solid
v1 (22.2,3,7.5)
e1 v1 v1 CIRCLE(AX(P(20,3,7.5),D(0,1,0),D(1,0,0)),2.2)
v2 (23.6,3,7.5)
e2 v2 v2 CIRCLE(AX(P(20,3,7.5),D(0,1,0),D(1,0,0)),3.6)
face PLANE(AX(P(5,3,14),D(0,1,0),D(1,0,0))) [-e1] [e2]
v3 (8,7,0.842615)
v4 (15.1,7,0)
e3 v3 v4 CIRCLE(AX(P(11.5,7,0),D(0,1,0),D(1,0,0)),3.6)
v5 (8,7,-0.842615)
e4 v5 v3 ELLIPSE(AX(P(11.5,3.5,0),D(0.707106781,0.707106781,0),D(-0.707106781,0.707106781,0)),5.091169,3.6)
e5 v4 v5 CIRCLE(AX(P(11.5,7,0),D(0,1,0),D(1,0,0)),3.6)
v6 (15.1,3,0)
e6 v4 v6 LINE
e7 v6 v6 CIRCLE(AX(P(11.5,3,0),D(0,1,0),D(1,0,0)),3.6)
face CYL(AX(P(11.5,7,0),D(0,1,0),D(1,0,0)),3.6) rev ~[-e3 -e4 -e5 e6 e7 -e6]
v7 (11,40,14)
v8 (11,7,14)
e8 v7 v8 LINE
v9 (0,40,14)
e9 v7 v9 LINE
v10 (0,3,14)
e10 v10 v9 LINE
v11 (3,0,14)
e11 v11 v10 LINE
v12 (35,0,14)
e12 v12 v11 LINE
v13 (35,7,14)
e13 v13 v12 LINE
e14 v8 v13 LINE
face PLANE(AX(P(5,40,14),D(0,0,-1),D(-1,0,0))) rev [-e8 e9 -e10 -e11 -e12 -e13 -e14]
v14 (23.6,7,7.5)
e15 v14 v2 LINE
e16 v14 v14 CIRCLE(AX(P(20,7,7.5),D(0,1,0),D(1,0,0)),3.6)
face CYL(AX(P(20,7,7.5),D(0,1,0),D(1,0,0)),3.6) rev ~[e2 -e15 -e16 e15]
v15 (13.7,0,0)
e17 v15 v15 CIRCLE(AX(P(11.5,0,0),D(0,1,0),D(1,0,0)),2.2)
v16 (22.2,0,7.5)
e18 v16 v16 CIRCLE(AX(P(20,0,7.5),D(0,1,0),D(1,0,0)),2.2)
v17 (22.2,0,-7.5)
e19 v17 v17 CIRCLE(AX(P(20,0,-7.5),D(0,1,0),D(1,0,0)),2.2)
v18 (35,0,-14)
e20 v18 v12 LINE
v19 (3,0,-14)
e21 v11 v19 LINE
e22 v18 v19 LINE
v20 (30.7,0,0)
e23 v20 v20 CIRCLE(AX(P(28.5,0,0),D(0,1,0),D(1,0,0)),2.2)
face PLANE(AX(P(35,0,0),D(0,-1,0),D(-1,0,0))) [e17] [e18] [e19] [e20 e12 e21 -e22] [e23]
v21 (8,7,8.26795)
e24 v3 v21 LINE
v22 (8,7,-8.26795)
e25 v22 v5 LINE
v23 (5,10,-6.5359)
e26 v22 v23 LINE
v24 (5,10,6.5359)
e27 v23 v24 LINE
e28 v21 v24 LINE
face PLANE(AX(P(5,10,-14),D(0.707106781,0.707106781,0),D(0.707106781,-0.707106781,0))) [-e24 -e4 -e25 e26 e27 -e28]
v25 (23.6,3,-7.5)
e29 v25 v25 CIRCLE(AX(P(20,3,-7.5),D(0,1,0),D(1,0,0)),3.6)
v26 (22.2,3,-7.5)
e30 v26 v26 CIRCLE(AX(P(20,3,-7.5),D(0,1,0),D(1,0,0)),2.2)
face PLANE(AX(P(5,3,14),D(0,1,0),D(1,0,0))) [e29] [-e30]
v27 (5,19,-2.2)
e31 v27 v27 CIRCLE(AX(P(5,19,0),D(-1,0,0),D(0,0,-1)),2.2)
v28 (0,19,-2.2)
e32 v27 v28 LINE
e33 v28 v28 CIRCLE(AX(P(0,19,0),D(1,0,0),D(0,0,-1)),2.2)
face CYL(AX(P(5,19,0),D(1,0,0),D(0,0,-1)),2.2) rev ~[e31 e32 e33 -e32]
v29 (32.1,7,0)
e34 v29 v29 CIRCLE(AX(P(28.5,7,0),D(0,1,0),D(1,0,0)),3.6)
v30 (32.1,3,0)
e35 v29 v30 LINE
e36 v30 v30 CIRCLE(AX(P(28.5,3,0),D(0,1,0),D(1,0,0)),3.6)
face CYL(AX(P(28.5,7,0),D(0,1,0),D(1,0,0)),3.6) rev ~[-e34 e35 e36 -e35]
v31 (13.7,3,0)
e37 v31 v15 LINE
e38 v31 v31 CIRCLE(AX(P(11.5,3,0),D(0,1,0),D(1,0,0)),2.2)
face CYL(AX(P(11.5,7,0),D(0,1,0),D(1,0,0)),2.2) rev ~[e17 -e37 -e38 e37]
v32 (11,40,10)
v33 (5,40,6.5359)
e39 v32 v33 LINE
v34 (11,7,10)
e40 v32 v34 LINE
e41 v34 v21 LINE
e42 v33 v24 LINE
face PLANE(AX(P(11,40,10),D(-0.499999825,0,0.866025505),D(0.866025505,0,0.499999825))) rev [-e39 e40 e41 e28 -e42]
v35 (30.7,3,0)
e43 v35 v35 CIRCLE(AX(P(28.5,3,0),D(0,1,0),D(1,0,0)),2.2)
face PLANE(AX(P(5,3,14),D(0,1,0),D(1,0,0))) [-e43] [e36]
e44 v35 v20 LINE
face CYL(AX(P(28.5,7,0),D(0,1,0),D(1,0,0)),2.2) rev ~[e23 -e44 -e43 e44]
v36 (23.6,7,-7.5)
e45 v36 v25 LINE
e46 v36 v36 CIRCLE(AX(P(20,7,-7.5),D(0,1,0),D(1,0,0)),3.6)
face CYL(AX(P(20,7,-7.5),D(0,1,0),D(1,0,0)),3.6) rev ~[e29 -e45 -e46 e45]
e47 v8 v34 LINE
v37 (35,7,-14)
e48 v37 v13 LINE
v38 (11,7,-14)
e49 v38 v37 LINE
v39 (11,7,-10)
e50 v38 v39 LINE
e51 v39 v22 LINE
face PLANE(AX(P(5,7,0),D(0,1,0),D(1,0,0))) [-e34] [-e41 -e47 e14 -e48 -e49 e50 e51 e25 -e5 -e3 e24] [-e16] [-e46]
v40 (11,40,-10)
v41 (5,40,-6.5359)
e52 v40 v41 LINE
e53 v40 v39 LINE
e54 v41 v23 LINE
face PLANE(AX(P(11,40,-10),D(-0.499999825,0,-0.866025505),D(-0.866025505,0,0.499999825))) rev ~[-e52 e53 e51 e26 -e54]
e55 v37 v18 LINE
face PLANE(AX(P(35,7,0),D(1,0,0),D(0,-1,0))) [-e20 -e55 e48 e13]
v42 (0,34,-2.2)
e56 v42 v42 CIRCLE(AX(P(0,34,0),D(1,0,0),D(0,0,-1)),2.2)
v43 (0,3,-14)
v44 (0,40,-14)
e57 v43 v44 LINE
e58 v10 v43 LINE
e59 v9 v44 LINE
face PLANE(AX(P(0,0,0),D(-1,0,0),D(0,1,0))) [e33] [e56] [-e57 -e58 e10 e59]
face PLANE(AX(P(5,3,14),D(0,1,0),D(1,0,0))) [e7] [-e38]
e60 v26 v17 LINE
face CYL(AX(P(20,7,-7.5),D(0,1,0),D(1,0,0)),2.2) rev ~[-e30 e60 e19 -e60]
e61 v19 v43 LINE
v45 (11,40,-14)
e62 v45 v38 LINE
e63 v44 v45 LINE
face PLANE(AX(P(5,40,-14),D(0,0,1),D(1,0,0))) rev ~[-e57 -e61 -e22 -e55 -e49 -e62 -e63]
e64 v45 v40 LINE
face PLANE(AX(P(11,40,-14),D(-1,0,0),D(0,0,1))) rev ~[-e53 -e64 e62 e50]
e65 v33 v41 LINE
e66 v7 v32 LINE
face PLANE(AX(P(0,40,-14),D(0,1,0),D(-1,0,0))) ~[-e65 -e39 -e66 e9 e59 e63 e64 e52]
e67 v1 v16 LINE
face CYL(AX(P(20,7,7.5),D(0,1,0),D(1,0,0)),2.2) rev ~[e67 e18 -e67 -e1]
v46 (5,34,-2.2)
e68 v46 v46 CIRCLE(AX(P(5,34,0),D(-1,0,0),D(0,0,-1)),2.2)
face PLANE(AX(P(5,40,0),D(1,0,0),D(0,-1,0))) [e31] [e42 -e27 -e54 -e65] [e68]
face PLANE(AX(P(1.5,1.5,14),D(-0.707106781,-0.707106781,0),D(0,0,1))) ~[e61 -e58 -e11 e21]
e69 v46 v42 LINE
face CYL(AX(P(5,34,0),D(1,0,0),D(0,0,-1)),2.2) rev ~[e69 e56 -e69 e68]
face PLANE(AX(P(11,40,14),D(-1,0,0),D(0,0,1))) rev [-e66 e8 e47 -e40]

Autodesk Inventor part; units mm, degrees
ref_plane "YZ Plane" through (0, 0, 0) normal (1, 0, 0) x (0, 1, 0)
ref_plane "XZ Plane" through (0, 0, 0) normal (0, 1, 0) x (-1, 0, 0)
ref_plane "XY Plane" through (0, 0, 0) normal (0, 0, 1) x (1, 0, 0)
sketch "Sketch1" plane through (0, 0, 0) normal (0, 0, 1) x (1, 0, 0)
  line L0 (35, 0) -> (0, 0)
  line L1 (0, 0) -> (0, 40)
  line L2 (0, 40) -> (5, 40)
  line L3 (5, 40) -> (5, 7)
  line L4 (5, 7) -> (35, 7)
  line L5 (35, 7) -> (35, 0)
  line L6 (-7, 0) -> (42, 0) projected
  line L7 (0, -8) -> (0, 48) projected
  dimension "d0" = 7
  dimension "d1" = 5
  dimension "d2" = 40
  dimension "d3" = 30
extrude "Extrusion1" add sketch "Sketch1" along normal mid plane 28
sketch "Sketch2" plane through (5, 7, 14) normal (0, 1, 0) x (1, 0, 0)
  circle A0 centre (15, 21.5) radius 2.2 projected
  circle A1 centre (23.5, 14) radius 2.2 projected
  circle A2 centre (15, 6.5) radius 2.2 projected
  circle A3 centre (6.5, 14) radius 2.2 projected
  point P0 (-5, 14)
extrude "Extrusion2" cut sketch "Sketch2" against normal through all
sketch "Sketch3" plane through (5, 7, 14) normal (0, 1, 0) x (1, 0, 0)
  circle A0 centre (15, 6.5) radius 2.2 projected
  circle A1 centre (15, 21.5) radius 2.2 projected
  circle A2 centre (23.5, 14) radius 2.2 projected
  circle A3 centre (6.5, 14) radius 2.2 projected
  line L0 (0, 28) -> (0, 0) projected
  line L1 (30, 0) -> (0, 0) projected
  line L2 (30, 28) -> (30, 0) projected
  line L3 (0, 28) -> (30, 28) projected
  circle A4 centre (6.5, 14) radius 3.6
  circle A5 centre (15, 21.5) radius 3.6
  circle A6 centre (23.5, 14) radius 2.2 projected
  circle A7 centre (23.5, 14) radius 3.6
  circle A8 centre (15, 6.5) radius 3.6
  point P0 (-5, 14)
  dimension "d8" = 7.2
extrude "Extrusion3" cut sketch "Sketch3" against normal blind 4 contours A4 | A5 | A7 | A8
chamfer "Chamfer1" distance 3 angle 45 1 edges at (5, 7, 0)
sketch "Sketch4" plane through (5, 40, 14) normal (1, 0, 0) x (0, 0, -1)
  line L0 (28, 0) -> (0, 0) projected
  line L1 (14, 0) -> (14, -21)
  circle A0 centre (14, -21) radius 2.2
  circle A1 centre (14, -6) radius 2.2
  point P0 (14, -40)
  dimension "d14" = 4.4
  dimension "d15" = 15
  dimension "d16" = 6
extrude "Extrusion4" cut sketch "Sketch4" against normal through all
chamfer "Chamfer2" distance 3 angle 45 1 edges at (0, 0, 0)
sketch "Sketch5" plane through (0, 40, 14) normal (0, 1, 0) x (1, 0, 0)
  line L0 (5, 28) -> (5, 0) projected
  line L1 (5, 28) -> (11, 28)
  line L2 (35, 28) -> (3, 28) projected
  line L3 (11, 24) -> (5, 20.5359)
  line L4 (11, 28) -> (11, 24)
  point P0 (0, 14)
  dimension "d22" = 60
  dimension "d23" = 6
  dimension "d24" = 4
extrude "Extrusion5" add sketch "Sketch5" against normal up to surface (33 mm away)
mirror "Mirror1" about plane through (0, 0, 0) normal (0, 0, 1) of "Extrusion5"
sketch "Sketch6" plane through (0, 40, -14) normal (-1, 0, 0) x (0, 0, 1)
  line L0 (0, 0) -> (28, 0) projected
  line L1 (8, 0) -> (20, 0)
  line L2 (20, 0) -> (20, -26)
  line L3 (20, -26) -> (8, -26)
  line L4 (8, -26) -> (8, 0)
  circle A0 centre (14, -21) radius 2.2 projected
  point P0 (14, -40)
  point P1 (14, 0)
  dimension "d27" = 12
  dimension "d28" = 5
split_face "Split1"
properties part number "Test Mount"
